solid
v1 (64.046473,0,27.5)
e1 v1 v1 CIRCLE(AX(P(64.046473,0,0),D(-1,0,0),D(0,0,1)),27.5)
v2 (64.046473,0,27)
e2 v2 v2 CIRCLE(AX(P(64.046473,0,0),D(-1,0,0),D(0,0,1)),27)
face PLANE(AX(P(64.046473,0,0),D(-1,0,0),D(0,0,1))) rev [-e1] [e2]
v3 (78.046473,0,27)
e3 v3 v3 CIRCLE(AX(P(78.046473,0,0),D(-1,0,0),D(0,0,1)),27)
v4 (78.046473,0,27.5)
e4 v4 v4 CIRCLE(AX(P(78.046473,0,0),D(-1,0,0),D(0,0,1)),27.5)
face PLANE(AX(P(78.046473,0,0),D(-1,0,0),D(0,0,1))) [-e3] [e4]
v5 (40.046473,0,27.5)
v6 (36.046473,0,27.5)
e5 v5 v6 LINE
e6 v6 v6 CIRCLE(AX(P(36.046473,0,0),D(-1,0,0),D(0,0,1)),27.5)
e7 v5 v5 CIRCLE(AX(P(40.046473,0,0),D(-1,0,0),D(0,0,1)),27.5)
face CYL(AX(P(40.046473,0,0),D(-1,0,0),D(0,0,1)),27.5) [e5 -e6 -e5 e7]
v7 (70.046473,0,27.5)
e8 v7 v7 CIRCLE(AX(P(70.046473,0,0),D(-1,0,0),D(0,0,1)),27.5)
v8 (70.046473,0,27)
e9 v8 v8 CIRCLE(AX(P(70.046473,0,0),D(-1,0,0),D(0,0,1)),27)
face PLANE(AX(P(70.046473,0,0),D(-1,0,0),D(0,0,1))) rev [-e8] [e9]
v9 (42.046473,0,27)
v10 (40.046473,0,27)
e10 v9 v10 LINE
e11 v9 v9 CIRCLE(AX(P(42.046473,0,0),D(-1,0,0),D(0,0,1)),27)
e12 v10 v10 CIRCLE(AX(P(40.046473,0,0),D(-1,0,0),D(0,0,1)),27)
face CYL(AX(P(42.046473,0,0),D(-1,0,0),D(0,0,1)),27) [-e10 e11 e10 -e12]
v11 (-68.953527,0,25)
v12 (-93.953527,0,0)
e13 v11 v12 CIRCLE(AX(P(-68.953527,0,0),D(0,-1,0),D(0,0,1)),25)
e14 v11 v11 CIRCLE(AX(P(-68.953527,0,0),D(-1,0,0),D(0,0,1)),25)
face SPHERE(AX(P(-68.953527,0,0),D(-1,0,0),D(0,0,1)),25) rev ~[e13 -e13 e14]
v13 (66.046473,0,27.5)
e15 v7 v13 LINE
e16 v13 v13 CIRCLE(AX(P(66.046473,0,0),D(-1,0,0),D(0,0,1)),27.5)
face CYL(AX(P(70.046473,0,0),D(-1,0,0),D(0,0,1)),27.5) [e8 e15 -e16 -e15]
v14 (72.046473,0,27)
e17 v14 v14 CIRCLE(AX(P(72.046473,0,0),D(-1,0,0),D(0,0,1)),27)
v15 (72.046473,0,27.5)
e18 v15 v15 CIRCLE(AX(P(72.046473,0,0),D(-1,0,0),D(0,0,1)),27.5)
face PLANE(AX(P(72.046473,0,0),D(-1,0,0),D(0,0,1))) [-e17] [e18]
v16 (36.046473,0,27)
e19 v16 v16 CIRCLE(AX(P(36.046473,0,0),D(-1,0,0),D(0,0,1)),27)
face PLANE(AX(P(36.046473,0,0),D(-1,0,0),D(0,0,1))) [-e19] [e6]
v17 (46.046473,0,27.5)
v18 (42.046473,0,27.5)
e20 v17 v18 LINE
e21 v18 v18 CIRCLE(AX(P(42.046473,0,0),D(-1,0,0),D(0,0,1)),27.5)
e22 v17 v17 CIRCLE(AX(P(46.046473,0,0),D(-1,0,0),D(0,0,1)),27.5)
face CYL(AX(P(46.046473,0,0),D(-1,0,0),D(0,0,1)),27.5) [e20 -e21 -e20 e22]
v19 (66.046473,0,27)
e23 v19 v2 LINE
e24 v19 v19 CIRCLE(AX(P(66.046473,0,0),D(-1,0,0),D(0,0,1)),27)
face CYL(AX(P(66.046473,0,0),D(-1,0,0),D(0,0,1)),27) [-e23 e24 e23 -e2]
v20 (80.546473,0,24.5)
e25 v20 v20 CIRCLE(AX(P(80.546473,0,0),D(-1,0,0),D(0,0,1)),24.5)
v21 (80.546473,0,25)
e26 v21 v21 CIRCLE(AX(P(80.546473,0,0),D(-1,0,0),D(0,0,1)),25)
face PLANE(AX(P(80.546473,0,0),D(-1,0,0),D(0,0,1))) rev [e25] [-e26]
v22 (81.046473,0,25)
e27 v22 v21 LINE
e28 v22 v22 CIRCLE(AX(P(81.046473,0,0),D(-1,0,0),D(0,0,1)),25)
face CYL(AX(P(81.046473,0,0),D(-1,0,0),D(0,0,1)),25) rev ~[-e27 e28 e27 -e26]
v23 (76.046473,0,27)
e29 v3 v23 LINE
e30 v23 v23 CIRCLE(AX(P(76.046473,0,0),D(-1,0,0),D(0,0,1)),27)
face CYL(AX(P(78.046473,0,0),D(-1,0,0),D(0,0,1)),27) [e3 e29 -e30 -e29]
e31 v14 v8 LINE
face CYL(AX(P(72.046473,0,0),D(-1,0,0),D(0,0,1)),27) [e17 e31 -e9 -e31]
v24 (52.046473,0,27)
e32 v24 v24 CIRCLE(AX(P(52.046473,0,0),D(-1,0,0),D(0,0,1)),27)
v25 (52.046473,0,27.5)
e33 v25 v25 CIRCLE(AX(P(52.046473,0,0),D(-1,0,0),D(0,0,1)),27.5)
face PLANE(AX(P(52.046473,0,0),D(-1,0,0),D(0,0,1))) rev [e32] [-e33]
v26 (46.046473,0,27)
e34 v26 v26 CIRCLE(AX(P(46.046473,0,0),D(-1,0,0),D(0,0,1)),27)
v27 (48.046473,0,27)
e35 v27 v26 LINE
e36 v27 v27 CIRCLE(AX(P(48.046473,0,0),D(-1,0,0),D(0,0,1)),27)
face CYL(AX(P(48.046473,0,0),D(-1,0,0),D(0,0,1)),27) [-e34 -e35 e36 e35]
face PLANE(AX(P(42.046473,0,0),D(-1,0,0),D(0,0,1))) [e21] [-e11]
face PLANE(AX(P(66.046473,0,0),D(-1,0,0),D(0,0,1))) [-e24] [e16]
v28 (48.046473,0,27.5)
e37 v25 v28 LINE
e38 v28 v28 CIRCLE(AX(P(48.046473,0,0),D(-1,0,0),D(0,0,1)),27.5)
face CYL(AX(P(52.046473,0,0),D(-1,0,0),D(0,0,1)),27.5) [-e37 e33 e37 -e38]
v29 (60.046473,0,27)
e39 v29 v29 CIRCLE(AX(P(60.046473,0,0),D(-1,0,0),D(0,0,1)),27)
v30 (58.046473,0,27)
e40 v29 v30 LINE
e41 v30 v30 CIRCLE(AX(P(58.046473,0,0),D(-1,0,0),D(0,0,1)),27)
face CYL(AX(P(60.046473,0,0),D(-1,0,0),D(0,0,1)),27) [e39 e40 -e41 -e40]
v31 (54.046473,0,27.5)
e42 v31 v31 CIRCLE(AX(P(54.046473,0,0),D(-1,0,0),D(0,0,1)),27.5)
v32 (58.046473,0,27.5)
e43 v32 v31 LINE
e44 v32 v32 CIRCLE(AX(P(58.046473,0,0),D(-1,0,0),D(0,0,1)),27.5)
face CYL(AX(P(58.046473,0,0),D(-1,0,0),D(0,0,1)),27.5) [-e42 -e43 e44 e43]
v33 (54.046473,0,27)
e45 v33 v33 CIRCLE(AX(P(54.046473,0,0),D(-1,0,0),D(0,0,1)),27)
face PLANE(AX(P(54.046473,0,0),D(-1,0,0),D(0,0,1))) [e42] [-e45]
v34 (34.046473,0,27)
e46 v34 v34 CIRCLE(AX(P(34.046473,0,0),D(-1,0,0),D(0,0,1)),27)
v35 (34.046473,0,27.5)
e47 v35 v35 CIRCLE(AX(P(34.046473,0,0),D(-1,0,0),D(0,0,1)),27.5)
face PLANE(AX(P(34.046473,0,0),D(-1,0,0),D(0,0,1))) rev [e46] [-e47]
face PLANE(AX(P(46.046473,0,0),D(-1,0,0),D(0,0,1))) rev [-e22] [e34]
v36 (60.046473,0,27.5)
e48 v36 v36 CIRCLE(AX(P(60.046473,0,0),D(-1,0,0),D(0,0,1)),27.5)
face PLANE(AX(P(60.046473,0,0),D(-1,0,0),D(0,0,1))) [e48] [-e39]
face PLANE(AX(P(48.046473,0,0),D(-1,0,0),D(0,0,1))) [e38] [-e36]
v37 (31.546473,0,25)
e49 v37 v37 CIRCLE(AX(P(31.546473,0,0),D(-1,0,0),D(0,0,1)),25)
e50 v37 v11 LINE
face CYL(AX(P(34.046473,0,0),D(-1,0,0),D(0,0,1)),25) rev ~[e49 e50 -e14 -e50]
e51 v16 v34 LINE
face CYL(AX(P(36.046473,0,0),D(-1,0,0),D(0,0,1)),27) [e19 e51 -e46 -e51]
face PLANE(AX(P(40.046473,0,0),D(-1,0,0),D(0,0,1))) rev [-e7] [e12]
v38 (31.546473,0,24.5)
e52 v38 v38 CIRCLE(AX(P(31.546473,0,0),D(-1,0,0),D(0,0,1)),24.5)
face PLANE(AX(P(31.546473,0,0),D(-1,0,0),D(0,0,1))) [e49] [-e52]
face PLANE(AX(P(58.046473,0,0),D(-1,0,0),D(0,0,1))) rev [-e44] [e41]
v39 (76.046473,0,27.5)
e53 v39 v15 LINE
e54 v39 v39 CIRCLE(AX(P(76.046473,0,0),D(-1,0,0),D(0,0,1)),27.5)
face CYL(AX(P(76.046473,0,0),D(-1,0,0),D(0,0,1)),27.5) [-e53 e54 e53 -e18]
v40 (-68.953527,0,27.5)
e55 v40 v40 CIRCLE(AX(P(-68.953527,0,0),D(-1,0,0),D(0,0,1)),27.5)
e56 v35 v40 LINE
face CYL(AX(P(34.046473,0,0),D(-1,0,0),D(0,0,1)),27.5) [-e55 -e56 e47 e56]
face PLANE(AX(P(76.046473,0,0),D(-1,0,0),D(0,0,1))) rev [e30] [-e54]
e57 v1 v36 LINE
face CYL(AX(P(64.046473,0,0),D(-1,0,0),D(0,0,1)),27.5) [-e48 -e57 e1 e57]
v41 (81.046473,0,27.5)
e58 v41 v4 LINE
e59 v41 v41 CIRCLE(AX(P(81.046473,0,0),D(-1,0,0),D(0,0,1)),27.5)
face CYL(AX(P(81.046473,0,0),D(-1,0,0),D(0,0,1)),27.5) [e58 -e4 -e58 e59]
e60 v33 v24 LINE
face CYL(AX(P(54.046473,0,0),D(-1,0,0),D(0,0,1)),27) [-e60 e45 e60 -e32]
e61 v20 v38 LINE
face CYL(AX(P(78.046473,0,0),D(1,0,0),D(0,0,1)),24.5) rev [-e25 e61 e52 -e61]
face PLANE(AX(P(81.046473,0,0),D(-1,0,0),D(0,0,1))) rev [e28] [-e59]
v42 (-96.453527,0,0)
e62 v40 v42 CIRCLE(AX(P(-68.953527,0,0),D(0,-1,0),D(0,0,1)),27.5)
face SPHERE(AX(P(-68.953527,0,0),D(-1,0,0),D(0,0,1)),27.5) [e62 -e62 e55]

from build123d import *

# Parameters (mm, degrees)
F2_T = 2.5


# Not quite as in the source:
# - a shell that OpenCascade refuses in one call is made with other operations: the cavity is built on its own and cut out


with BuildPart() as f1:
    # F0 (on Front) → F1 (revolve)
    with BuildSketch(Plane.XZ):
        with BuildLine():
            Line((-96.4535274908, 0), (81.0464725092, 0))
            Line((81.0464725092, 0), (81.0464725092, 27.5))
            Line((81.0464725092, 27.5), (78.0464725092, 27.5))
            Line((78.0464725092, 27.5), (78.0464725092, 27))
            Line((78.0464725092, 27), (76.0464725092, 27))
            Line((76.0464725092, 27), (76.0464725092, 27.5))
            Line((76.0464725092, 27.5), (72.0464725092, 27.5))
            Line((72.0464725092, 27.5), (72.0464725092, 27))
            Line((72.0464725092, 27), (70.0464725092, 27))
            Line((70.0464725092, 27), (70.0464725092, 27.5))
            Line((70.0464725092, 27.5), (66.0464725092, 27.5))
            Line((66.0464725092, 27.5), (66.0464725092, 27))
            Line((66.0464725092, 27), (64.0464725092, 27))
            Line((64.0464725092, 27), (64.0464725092, 27.5))
            Line((64.0464725092, 27.5), (60.0464725092, 27.5))
            Line((60.0464725092, 27.5), (60.0464725092, 27))
            Line((60.0464725092, 27), (58.0464725092, 27))
            Line((58.0464725092, 27), (58.0464725092, 27.5))
            Line((58.0464725092, 27.5), (56.0464725092, 27.5))
            Line((56.0464725092, 27.5), (54.0464725092, 27.5))
            Line((54.0464725092, 27.5), (54.0464725092, 27))
            Line((54.0464725092, 27), (52.0464725092, 27))
            Line((52.0464725092, 27), (52.0464725092, 27.5))
            Line((52.0464725092, 27.5), (48.0464725092, 27.5))
            Line((48.0464725092, 27.5), (48.0464725092, 27))
            Line((48.0464725092, 27), (46.0464725092, 27))
            Line((46.0464725092, 27), (46.0464725092, 27.5))
            Line((46.0464725092, 27.5), (42.0464725092, 27.5))
            Line((42.0464725092, 27.5), (42.0464725092, 27))
            Line((42.0464725092, 27), (40.0464725092, 27))
            Line((40.0464725092, 27), (40.0464725092, 27.5))
            Line((40.0464725092, 27.5), (36.0464725092, 27.5))
            Line((36.0464725092, 27.5), (36.0464725092, 27))
            Line((36.0464725092, 27), (34.0464725092, 27))
            Line((34.0464725092, 27), (34.0464725092, 27.5))
            Line((34.0464725092, 27.5), (32.0464725092, 27.5))
            Line((32.0464725092, 27.5), (25.0464725092, 27.5))
            Line((25.0464725092, 27.5), (-68.9535274908, 27.5))
            ThreePointArc((-68.9535274908, 27.5), (-88.3989639735, 19.4454364826), (-96.4535274908, 0))
        make_face()
    revolve(axis=Axis((-7.7035274908, 0, 0), (-1, 0, 0)))

    # F2: shell of thickness 2.5, made by hand


with BuildPart() as f2_core1:
    # F2_t2: copy of F1
    add(f1.part)

    # the walls: a layer under each face that stays
    f2_faces = [f2_core1.faces().sort_by_distance(p)[0] for p in [
        (-88.3989639735, 0, -19.4454364826),
        (-17.4535274908, 0, -27.5),
        (34.0464725092, -13.2407407407, -24.0625),
        (35.0464725092, 0, -27),
        (36.0464725092, -13.2407407407, 24.0625),
        (38.0464725092, 0, -27.5),
        (40.0464725092, -13.2407407407, -24.0625),
        (41.0464725092, 0, -27),
        (42.0464725092, -13.2407407407, 24.0625),
        (44.0464725092, 0, -27.5),
        (46.0464725092, -13.2407407407, -24.0625),
        (47.0464725092, 0, -27),
        (48.0464725092, -13.2407407407, 24.0625),
        (50.0464725092, 0, -27.5),
        (52.0464725092, -13.2407407407, -24.0625),
        (53.0464725092, 0, -27),
        (54.0464725092, -13.2407407407, 24.0625),
        (56.0464725092, 0, -27.5),
        (58.0464725092, -13.2407407407, -24.0625),
        (59.0464725092, 0, -27),
        (60.0464725092, -13.2407407407, 24.0625),
        (62.0464725092, 0, -27.5),
        (64.0464725092, -13.2407407407, -24.0625),
        (65.0464725092, 0, -27),
        (66.0464725092, -13.2407407407, 24.0625),
        (68.0464725092, 0, -27.5),
        (70.0464725092, -13.2407407407, -24.0625),
        (71.0464725092, 0, -27),
        (72.0464725092, -13.2407407407, 24.0625),
        (74.0464725092, 0, -27.5),
        (76.0464725092, -13.2407407407, -24.0625),
        (77.0464725092, 0, -27),
        (78.0464725092, -13.2407407407, 24.0625),
        (79.5464725092, 0, -27.5),
    ]]
    thicken(f2_faces, amount=-F2_T, mode=Mode.SUBTRACT)

    # F2_s3 → F2_t4 (revolve, cut)
    with BuildSketch(Plane.XZ):
        Polygon((34.0714725092, 27.025), (31.5464725092, 27), (31.5464725092, 24.5), (34.0464725092, 24.5), align=None)
    revolve(axis=Axis((34.0464725092, 0, 0), (-1, 0, 0)), mode=Mode.SUBTRACT)

    # F2_s5 → F2_t6 (revolve, cut)
    with BuildSketch(Plane.XZ):
        Polygon((36.0214725092, 27.025), (36.0464725092, 24.5), (38.5464725092, 24.5), (38.5464725092, 27), align=None)
    revolve(axis=Axis((36.0464725092, 0, 0), (-1, 0, 0)), mode=Mode.SUBTRACT)

    # F2_s7 → F2_t8 (revolve, cut)
    with BuildSketch(Plane.XZ):
        Polygon((40.0714725092, 27.025), (37.5464725092, 27), (37.5464725092, 24.5), (40.0464725092, 24.5), align=None)
    revolve(axis=Axis((40.0464725092, 0, 0), (-1, 0, 0)), mode=Mode.SUBTRACT)

    # F2_s9 → F2_t10 (revolve, cut)
    with BuildSketch(Plane.XZ):
        Polygon((42.0214725092, 27.025), (42.0464725092, 24.5), (44.5464725092, 24.5), (44.5464725092, 27), align=None)
    revolve(axis=Axis((42.0464725092, 0, 0), (-1, 0, 0)), mode=Mode.SUBTRACT)

    # F2_s11 → F2_t12 (revolve, cut)
    with BuildSketch(Plane.XZ):
        Polygon((46.0714725092, 27.025), (43.5464725092, 27), (43.5464725092, 24.5), (46.0464725092, 24.5), align=None)
    revolve(axis=Axis((46.0464725092, 0, 0), (-1, 0, 0)), mode=Mode.SUBTRACT)

    # F2_s13 → F2_t14 (revolve, cut)
    with BuildSketch(Plane.XZ):
        Polygon((48.0214725092, 27.025), (48.0464725092, 24.5), (50.5464725092, 24.5), (50.5464725092, 27), align=None)
    revolve(axis=Axis((48.0464725092, 0, 0), (-1, 0, 0)), mode=Mode.SUBTRACT)

    # F2_s15 → F2_t16 (revolve, cut)
    with BuildSketch(Plane.XZ):
        Polygon((52.0714725092, 27.025), (49.5464725092, 27), (49.5464725092, 24.5), (52.0464725092, 24.5), align=None)
    revolve(axis=Axis((52.0464725092, 0, 0), (-1, 0, 0)), mode=Mode.SUBTRACT)

    # F2_s17 → F2_t18 (revolve, cut)
    with BuildSketch(Plane.XZ):
        Polygon((54.0214725092, 27.025), (54.0464725092, 24.5), (56.5464725092, 24.5), (56.5464725092, 27), align=None)
    revolve(axis=Axis((54.0464725092, 0, 0), (-1, 0, 0)), mode=Mode.SUBTRACT)

    # F2_s19 → F2_t20 (revolve, cut)
    with BuildSketch(Plane.XZ):
        Polygon((58.0714725092, 27.025), (55.5464725092, 27), (55.5464725092, 24.5), (58.0464725092, 24.5), align=None)
    revolve(axis=Axis((58.0464725092, 0, 0), (-1, 0, 0)), mode=Mode.SUBTRACT)

    # F2_s21 → F2_t22 (revolve, cut)
    with BuildSketch(Plane.XZ):
        Polygon((60.0214725092, 27.025), (60.0464725092, 24.5), (62.5464725092, 24.5), (62.5464725092, 27), align=None)
    revolve(axis=Axis((60.0464725092, 0, 0), (-1, 0, 0)), mode=Mode.SUBTRACT)

    # F2_s23 → F2_t24 (revolve, cut)
    with BuildSketch(Plane.XZ):
        Polygon((64.0714725092, 27.025), (61.5464725092, 27), (61.5464725092, 24.5), (64.0464725092, 24.5), align=None)
    revolve(axis=Axis((64.0464725092, 0, 0), (-1, 0, 0)), mode=Mode.SUBTRACT)

    # F2_s25 → F2_t26 (revolve, cut)
    with BuildSketch(Plane.XZ):
        Polygon((66.0214725092, 27.025), (66.0464725092, 24.5), (68.5464725092, 24.5), (68.5464725092, 27), align=None)
    revolve(axis=Axis((66.0464725092, 0, 0), (-1, 0, 0)), mode=Mode.SUBTRACT)

    # F2_s27 → F2_t28 (revolve, cut)
    with BuildSketch(Plane.XZ):
        Polygon((70.0714725092, 27.025), (67.5464725092, 27), (67.5464725092, 24.5), (70.0464725092, 24.5), align=None)
    revolve(axis=Axis((70.0464725092, 0, 0), (-1, 0, 0)), mode=Mode.SUBTRACT)

    # F2_s29 → F2_t30 (revolve, cut)
    with BuildSketch(Plane.XZ):
        Polygon((72.0214725092, 27.025), (72.0464725092, 24.5), (74.5464725092, 24.5), (74.5464725092, 27), align=None)
    revolve(axis=Axis((72.0464725092, 0, 0), (-1, 0, 0)), mode=Mode.SUBTRACT)

    # F2_s31 → F2_t32 (revolve, cut)
    with BuildSketch(Plane.XZ):
        Polygon((76.0714725092, 27.025), (73.5464725092, 27), (73.5464725092, 24.5), (76.0464725092, 24.5), align=None)
    revolve(axis=Axis((76.0464725092, 0, 0), (-1, 0, 0)), mode=Mode.SUBTRACT)

    # F2_s33 → F2_t34 (revolve, cut)
    with BuildSketch(Plane.XZ):
        Polygon((78.0214725092, 27.025), (78.0464725092, 24.5), (80.5464725092, 24.5), (80.5464725092, 27), align=None)
    revolve(axis=Axis((78.0464725092, 0, 0), (-1, 0, 0)), mode=Mode.SUBTRACT)


with BuildPart() as f1_1:
    add(f1.part)

    # what is left inside the walls is the cavity
    f2_cavity = [f2_core1.part.solids().sort_by_distance(p)[0] for p in [
        (-1.953527, 0, -24.975),
    ]]
    add(f2_cavity, mode=Mode.SUBTRACT)


solid = f1_1.part
